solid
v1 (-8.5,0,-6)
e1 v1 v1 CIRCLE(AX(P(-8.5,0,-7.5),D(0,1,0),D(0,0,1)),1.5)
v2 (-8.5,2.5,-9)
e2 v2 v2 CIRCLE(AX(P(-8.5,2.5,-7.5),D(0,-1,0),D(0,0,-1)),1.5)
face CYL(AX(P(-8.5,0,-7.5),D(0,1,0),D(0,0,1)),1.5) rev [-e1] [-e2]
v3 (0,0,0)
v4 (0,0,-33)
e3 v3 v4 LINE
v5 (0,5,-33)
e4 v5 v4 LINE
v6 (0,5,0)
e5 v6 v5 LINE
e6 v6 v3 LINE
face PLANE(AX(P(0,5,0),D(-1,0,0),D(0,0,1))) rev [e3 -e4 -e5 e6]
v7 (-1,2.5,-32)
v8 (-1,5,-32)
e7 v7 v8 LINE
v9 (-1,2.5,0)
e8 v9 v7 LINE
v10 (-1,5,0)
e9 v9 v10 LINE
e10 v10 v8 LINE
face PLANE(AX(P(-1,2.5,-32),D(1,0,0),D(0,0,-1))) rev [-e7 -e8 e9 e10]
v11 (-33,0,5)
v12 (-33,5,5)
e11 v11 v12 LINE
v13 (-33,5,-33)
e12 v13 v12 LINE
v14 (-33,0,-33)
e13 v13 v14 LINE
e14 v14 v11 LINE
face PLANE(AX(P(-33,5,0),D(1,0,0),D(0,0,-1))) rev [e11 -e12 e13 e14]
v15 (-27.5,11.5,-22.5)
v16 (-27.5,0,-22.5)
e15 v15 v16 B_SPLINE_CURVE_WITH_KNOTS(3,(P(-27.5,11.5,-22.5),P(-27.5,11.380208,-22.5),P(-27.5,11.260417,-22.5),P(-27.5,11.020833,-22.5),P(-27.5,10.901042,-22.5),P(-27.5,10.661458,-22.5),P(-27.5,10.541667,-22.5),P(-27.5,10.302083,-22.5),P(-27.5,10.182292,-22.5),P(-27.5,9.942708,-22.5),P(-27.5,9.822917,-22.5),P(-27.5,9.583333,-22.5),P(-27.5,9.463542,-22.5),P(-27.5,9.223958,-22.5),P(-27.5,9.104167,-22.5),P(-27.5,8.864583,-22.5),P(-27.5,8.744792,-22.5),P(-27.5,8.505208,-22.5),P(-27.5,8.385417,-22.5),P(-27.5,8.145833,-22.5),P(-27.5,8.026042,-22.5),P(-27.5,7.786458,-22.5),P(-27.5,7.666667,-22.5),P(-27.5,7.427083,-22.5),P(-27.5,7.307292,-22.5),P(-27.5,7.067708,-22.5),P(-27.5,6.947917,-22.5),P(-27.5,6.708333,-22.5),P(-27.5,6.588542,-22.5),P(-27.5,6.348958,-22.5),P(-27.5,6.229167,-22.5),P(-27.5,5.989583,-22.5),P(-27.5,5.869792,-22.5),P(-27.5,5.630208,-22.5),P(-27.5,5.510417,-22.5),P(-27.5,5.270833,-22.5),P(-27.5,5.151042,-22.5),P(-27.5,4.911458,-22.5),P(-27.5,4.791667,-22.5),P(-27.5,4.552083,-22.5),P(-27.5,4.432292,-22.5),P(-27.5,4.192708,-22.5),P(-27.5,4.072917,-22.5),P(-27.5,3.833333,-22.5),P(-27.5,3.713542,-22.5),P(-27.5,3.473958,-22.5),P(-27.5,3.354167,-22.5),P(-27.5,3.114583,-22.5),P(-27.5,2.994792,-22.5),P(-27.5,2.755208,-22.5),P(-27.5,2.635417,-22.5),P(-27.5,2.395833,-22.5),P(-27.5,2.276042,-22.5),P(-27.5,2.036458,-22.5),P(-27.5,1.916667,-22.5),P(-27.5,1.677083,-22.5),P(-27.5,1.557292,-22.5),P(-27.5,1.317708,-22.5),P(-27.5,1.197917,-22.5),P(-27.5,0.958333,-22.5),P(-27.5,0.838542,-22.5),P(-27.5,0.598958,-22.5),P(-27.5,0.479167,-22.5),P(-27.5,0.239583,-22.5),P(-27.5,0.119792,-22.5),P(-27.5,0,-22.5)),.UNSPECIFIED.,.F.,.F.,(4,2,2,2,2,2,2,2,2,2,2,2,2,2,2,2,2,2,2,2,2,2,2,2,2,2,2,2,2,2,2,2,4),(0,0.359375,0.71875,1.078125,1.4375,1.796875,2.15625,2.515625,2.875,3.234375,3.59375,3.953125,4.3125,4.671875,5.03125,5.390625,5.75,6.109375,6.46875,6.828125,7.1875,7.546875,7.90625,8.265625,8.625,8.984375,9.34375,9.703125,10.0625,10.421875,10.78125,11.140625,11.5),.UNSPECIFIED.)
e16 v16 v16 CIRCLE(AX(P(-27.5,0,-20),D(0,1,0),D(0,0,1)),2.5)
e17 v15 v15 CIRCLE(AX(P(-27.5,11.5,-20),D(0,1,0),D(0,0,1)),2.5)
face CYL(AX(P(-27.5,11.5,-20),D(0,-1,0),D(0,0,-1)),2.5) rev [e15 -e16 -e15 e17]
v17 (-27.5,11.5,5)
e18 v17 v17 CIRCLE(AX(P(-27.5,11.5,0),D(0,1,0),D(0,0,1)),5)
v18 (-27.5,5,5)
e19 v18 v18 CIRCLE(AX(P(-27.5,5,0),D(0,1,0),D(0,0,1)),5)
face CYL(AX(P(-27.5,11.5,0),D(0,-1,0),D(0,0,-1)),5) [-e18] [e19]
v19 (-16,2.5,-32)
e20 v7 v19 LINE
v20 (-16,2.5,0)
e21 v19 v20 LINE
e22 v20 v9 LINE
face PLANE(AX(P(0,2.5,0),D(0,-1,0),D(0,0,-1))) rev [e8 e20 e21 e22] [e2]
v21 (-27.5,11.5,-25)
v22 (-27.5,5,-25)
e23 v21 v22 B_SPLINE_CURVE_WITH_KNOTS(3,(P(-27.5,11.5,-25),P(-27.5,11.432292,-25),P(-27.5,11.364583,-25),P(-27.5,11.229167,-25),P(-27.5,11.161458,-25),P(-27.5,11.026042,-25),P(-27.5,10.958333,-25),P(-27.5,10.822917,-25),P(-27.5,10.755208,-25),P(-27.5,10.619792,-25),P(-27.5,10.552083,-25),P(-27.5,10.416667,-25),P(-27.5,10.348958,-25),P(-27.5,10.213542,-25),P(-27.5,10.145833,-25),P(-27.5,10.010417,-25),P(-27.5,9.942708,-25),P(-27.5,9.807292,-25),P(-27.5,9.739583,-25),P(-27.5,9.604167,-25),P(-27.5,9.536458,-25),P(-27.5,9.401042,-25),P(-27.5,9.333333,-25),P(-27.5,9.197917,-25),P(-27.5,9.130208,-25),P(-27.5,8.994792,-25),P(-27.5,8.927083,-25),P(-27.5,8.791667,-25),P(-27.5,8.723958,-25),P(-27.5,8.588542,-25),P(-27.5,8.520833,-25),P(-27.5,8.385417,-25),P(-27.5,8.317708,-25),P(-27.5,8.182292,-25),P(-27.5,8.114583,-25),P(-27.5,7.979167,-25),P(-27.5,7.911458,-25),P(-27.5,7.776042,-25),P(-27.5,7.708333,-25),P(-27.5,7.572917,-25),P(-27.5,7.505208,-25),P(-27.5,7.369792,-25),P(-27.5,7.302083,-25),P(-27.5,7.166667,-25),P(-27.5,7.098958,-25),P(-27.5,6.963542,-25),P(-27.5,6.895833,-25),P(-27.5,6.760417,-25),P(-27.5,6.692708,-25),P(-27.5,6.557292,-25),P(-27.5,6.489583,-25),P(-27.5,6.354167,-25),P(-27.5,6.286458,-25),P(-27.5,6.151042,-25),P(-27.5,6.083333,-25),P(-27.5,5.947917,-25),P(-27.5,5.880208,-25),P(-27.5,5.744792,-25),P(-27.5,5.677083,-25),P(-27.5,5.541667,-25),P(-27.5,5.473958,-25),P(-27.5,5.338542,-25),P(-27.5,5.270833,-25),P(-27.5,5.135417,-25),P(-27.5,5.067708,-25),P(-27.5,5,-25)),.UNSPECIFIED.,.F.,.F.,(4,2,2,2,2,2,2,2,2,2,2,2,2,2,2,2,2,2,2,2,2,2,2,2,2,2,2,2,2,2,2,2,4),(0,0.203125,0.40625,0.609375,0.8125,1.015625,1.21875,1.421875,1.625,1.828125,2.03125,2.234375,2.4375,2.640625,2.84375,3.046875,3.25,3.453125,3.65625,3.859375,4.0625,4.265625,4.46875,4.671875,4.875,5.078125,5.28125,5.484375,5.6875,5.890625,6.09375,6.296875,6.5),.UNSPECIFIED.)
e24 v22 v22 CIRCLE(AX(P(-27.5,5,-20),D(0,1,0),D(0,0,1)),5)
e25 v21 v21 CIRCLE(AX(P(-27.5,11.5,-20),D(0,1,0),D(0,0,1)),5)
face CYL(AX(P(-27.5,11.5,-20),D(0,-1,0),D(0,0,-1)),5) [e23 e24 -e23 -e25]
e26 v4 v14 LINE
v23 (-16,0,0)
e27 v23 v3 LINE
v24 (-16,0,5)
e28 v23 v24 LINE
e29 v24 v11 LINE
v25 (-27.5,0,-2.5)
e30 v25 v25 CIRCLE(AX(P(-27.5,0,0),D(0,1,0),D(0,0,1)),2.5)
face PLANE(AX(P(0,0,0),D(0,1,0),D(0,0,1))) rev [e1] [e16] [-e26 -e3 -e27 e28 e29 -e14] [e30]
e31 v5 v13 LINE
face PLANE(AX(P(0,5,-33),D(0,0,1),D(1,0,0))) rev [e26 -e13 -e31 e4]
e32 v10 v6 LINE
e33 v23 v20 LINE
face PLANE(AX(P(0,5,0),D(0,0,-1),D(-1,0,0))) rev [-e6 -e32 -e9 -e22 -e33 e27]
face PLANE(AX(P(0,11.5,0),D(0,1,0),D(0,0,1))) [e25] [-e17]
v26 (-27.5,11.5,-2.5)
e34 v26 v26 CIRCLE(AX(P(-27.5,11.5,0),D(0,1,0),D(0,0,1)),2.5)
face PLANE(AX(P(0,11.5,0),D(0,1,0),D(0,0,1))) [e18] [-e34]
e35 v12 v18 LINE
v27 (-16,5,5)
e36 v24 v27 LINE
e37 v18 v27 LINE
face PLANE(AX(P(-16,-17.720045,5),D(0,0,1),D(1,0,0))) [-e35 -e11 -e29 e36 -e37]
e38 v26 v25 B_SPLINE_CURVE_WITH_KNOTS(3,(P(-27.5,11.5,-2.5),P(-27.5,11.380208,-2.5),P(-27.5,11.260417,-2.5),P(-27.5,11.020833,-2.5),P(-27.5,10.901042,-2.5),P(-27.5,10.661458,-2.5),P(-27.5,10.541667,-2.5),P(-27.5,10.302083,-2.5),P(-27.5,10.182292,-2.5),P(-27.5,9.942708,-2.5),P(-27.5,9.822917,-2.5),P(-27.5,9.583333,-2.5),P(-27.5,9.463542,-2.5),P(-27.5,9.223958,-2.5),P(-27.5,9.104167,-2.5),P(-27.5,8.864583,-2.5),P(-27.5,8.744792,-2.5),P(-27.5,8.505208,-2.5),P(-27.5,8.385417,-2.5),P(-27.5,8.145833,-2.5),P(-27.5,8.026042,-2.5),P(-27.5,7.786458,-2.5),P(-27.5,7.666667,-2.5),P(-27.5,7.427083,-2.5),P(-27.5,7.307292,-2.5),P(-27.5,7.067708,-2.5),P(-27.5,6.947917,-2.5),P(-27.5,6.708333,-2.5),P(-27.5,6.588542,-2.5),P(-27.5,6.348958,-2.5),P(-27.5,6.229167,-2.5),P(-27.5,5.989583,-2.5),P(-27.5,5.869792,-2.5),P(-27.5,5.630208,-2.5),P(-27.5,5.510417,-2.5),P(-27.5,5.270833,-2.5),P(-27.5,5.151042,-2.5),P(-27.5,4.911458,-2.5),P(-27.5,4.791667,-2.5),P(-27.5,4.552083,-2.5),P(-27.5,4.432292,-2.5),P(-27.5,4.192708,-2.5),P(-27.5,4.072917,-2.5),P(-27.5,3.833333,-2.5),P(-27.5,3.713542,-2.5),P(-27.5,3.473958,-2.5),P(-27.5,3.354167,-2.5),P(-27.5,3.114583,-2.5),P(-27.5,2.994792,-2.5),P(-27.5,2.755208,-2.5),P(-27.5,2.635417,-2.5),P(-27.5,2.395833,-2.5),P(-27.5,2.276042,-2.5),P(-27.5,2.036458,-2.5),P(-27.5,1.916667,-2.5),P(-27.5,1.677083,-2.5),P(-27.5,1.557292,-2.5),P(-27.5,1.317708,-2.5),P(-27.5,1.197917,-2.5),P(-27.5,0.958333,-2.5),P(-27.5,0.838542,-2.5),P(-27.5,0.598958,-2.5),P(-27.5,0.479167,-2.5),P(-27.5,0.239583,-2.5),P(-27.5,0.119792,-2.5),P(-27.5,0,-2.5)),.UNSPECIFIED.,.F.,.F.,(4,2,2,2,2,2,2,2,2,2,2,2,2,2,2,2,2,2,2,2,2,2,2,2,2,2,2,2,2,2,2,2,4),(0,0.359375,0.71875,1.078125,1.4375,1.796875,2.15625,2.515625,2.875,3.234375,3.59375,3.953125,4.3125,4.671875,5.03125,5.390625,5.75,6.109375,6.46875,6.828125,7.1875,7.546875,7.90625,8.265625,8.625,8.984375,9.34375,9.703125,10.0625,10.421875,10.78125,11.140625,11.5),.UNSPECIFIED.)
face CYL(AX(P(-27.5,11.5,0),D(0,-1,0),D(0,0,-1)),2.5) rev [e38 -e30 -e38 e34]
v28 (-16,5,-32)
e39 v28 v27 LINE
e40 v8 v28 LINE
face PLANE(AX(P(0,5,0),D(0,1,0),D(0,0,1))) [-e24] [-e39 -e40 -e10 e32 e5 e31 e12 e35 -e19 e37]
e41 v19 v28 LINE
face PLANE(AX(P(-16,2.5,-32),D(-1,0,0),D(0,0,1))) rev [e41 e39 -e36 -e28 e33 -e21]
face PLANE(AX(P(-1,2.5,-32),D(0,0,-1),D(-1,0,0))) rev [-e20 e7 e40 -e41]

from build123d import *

# Parameters (mm, degrees)
SKETCH1_W                = 33
SKETCH1_H                = 33
BOSS_EXTRUDE1_DEPTH      = 5
SKETCH2_W                = 15
SKETCH2_H                = 32
CUT_EXTRUDE1_DEPTH       = 2.5
SKETCH4_W                = 17
SKETCH4_H                = 5
BOSS_EXTRUDE3_DEPTH      = 5
SKETCH3_R                = 5
SKETCH3_R_2              = 2.5
BOSS_EXTRUDE4_DEPTH      = 6.5
CUT_EXTRUDE4_START       = -5
CUT_EXTRUDE4_OUTLINE_R   = 2.5
CUT_EXTRUDE4_OUTLINE_R_2 = 1.5
CUT_EXTRUDE4_DEPTH       = 5


# Read off the part's stored shape, not the designer's step: Cut-Extrude4
with BuildPart() as part:
    # Sketch1 → Boss-Extrude1 (new body)
    with BuildSketch(Plane(origin=(0, 0, 0), x_dir=(1, 0, 0), z_dir=(0, 1, 0))):
        with Locations((-16.5, 16.5)):
            Rectangle(SKETCH1_W, SKETCH1_H)
    extrude(amount=BOSS_EXTRUDE1_DEPTH)

    # Sketch2 → Cut-Extrude1 (cut)
    with BuildSketch(Plane(origin=(0, 5, 0), x_dir=(1, 0, 0), z_dir=(0, 1, 0))):
        with Locations((-8.5, 16)):
            Rectangle(SKETCH2_W, SKETCH2_H)
    extrude(amount=-CUT_EXTRUDE1_DEPTH, mode=Mode.SUBTRACT)

    # Sketch4 → Boss-Extrude3 (add)
    with BuildSketch(Plane(origin=(0, 5, 0), x_dir=(1, 0, 0), z_dir=(0, 1, 0))):
        with Locations((-24.5, -2.5)):
            Rectangle(SKETCH4_W, SKETCH4_H)
    extrude(amount=-BOSS_EXTRUDE3_DEPTH)

    # Sketch3 → Boss-Extrude4 (add)
    # profile 1 of 2: a face of its own
    with BuildSketch(Plane(origin=(0, 5, 0), x_dir=(1, 0, 0), z_dir=(0, 1, 0))):
        with Locations(Location((-27.5, 20, 0), (0, 0, 90))):
            Circle(SKETCH3_R)
        with Locations(Location((-27.5, 20, 0), (0, 0, 90))):
            Circle(SKETCH3_R_2, mode=Mode.SUBTRACT)
    # profile 2 of 2: a face of its own
    with BuildSketch(Plane(origin=(0, 5, 0), x_dir=(1, 0, 0), z_dir=(0, 1, 0))):
        with Locations(Location((-27.5, 0, 0), (0, 0, 270))):
            Circle(SKETCH3_R)
        with Locations(Location((-27.5, 0, 0), (0, 0, 90))):
            Circle(SKETCH3_R_2, mode=Mode.SUBTRACT)
    extrude(amount=BOSS_EXTRUDE4_DEPTH)

    # Cut-Extrude4 outline → Cut-Extrude4 (cut)
    with BuildSketch(Plane(origin=(0, 5, 0), x_dir=(1, 0, 0), z_dir=(0, 1, 0)).offset(CUT_EXTRUDE4_START)):
        with Locations((-27.5, 20)):
            Circle(CUT_EXTRUDE4_OUTLINE_R)
        with Locations((-27.5, 0)):
            Circle(CUT_EXTRUDE4_OUTLINE_R)
        with Locations((-8.5, 7.5)):
            Circle(CUT_EXTRUDE4_OUTLINE_R_2)
    extrude(amount=CUT_EXTRUDE4_DEPTH, mode=Mode.SUBTRACT)


solid = part.part
